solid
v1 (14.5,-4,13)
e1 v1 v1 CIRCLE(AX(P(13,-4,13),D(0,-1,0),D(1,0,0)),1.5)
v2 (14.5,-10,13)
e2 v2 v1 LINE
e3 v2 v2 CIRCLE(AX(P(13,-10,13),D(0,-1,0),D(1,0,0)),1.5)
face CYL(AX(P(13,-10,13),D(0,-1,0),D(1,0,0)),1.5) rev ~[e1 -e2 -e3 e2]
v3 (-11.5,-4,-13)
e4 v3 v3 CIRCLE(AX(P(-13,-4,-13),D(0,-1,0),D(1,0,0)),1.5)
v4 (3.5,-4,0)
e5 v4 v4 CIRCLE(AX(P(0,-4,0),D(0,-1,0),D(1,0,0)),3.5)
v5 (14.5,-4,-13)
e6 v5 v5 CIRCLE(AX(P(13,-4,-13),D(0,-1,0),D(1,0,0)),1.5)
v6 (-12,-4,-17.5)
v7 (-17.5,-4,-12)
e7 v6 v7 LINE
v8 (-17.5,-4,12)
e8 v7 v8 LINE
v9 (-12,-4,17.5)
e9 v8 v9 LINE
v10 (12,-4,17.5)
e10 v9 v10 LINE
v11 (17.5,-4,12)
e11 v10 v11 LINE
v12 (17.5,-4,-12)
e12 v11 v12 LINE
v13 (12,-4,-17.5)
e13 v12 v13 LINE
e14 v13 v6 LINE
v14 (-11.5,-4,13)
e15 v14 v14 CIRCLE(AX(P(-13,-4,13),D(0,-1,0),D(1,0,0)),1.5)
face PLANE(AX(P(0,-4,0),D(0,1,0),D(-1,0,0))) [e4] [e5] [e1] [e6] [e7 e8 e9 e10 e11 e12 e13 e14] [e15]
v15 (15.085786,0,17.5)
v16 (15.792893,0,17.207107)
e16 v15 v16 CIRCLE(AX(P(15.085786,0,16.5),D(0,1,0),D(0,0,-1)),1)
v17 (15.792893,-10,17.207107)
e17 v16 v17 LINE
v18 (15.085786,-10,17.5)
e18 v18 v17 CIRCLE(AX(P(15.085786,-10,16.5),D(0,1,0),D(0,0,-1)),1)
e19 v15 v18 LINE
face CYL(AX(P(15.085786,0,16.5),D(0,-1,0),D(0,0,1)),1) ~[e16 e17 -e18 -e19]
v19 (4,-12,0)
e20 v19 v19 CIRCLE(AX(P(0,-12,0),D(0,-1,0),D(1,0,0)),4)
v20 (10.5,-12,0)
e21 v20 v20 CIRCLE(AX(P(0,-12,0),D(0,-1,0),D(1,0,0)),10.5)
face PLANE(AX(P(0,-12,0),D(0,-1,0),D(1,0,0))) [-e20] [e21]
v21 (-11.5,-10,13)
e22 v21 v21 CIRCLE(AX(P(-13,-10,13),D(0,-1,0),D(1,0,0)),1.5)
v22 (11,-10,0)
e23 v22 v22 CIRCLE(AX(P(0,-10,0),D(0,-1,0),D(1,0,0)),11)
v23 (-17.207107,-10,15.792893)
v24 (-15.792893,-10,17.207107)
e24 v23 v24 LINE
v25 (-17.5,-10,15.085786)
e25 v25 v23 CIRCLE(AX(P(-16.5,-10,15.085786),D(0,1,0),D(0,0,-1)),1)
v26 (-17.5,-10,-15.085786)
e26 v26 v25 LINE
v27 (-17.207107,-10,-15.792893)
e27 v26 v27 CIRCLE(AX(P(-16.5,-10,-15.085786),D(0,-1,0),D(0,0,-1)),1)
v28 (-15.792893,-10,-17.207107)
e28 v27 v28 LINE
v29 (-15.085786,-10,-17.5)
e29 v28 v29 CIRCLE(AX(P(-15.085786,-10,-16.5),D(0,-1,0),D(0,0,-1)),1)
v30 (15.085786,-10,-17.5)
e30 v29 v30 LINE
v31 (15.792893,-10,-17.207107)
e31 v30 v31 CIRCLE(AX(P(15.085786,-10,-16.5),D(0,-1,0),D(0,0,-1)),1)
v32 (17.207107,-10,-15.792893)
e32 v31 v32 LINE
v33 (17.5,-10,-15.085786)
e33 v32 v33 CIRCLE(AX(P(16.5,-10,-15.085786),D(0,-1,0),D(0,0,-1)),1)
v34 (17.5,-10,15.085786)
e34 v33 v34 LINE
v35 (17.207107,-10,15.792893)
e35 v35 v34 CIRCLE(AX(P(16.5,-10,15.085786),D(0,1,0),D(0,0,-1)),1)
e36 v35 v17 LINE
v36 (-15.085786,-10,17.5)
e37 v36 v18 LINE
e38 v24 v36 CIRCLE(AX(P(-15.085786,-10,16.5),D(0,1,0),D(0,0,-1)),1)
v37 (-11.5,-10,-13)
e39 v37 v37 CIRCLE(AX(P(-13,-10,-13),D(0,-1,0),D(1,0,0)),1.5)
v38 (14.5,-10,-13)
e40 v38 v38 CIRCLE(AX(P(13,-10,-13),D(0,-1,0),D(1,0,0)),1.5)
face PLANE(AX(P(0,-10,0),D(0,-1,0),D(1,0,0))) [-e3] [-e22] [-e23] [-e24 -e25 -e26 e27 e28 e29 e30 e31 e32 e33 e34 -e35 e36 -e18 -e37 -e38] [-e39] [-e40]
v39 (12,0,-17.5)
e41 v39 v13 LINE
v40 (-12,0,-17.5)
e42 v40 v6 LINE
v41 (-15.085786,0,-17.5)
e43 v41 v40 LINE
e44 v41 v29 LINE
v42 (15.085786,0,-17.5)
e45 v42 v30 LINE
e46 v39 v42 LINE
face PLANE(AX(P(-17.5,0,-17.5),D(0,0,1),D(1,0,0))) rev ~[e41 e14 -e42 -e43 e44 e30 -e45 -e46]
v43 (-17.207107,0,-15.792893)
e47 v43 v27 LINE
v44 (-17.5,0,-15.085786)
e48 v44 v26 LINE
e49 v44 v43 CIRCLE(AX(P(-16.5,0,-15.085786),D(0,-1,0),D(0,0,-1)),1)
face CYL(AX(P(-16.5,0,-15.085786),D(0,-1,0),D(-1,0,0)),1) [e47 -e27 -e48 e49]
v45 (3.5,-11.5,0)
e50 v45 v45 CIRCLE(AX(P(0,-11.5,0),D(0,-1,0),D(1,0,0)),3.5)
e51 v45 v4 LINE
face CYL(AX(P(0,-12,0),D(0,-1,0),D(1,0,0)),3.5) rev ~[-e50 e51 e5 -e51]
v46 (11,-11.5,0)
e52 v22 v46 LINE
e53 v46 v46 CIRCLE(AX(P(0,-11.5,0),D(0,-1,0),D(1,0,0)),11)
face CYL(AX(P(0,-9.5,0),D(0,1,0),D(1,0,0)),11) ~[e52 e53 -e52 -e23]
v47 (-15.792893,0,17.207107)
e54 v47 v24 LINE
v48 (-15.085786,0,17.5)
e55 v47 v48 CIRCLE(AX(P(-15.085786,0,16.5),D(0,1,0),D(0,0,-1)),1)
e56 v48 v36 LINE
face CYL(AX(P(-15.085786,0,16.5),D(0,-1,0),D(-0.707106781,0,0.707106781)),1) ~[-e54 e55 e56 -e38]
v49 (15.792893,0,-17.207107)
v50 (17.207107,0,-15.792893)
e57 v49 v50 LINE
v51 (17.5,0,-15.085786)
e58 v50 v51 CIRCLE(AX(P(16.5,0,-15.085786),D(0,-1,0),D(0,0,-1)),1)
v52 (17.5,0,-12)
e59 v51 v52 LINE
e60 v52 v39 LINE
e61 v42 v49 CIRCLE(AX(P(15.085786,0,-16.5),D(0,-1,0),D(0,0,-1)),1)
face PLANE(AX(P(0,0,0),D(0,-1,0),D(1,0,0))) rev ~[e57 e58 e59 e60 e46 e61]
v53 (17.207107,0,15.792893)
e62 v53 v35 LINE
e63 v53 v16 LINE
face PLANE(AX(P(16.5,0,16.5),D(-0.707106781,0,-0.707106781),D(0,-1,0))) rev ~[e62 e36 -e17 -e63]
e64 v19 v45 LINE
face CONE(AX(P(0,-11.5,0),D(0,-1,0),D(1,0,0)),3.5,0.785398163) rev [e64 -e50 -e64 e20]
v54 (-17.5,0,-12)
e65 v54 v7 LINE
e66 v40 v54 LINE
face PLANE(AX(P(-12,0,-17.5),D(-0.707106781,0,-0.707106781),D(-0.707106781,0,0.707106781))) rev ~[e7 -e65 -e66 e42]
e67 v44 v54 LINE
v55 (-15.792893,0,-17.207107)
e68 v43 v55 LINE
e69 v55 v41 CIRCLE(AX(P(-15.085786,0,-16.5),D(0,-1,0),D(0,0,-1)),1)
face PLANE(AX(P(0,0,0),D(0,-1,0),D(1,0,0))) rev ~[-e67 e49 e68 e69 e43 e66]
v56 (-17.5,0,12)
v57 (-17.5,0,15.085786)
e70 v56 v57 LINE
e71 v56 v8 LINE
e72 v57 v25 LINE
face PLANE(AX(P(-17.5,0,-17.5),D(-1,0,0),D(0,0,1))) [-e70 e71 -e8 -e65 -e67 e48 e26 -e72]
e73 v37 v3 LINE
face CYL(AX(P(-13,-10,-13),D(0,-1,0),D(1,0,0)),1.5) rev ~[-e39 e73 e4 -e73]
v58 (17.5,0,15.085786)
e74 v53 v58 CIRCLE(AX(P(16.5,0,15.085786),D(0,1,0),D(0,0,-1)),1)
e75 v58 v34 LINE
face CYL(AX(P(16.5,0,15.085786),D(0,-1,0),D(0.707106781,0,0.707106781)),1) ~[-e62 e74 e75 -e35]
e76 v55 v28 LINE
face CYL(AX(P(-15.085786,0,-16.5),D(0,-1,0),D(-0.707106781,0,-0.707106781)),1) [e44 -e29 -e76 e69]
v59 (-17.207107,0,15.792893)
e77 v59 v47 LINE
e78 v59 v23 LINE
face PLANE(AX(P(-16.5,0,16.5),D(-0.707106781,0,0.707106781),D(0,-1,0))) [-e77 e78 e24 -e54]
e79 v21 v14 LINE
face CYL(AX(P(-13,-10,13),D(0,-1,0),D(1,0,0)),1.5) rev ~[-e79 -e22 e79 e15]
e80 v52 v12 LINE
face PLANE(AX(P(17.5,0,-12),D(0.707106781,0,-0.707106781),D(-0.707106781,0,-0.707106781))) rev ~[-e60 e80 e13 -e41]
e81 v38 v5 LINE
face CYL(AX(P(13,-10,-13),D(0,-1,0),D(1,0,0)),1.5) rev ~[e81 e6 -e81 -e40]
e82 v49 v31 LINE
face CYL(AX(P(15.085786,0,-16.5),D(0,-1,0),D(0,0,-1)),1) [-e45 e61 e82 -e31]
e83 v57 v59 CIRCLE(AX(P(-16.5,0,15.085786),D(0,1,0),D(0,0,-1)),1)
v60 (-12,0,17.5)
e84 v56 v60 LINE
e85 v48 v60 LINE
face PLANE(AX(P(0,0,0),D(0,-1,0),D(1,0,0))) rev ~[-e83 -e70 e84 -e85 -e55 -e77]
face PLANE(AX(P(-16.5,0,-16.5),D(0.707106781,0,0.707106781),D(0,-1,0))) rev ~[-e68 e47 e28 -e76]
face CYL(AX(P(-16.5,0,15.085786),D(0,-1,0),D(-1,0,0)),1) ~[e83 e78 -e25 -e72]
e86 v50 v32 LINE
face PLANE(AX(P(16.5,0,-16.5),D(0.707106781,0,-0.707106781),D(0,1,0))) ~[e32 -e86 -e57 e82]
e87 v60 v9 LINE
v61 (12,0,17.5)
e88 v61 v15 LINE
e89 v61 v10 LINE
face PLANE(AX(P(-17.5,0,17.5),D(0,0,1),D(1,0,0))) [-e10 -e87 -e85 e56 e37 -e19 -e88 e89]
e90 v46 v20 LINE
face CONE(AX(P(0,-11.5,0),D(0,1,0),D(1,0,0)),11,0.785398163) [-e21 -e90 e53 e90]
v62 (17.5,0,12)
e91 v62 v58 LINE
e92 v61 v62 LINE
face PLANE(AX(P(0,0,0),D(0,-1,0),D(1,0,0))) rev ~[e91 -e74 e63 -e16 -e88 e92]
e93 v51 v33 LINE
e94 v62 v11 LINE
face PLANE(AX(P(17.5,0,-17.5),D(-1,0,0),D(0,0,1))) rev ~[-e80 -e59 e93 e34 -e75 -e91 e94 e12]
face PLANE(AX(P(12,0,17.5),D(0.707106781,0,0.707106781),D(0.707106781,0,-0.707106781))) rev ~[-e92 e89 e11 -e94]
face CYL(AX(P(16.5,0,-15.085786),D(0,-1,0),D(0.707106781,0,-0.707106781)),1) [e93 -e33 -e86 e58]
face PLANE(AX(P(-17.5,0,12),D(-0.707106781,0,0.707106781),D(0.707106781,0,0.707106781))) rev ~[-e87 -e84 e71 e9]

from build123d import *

# Parameters (mm, degrees)
F0_W      = 35
F0_H      = 35
F1_DEPTH  = 10
F2_SIZE   = 2
F3_R      = 11
F4_DEPTH  = 0.5
F5_R      = 11
F6_DEPTH  = 2.5
F7_R      = 3.5
F8_DEPTH  = 12.001
F9_R      = 1
F10_SIZE  = 0.5
F11_R     = 1.5
F12_DEPTH = 10.001
F14_DEPTH = 4


with BuildPart() as f1:
    # F0 (on Front) → F1 (new body)
    with BuildSketch(Plane.XZ):
        Rectangle(F0_W, F0_H)
    extrude(amount=F1_DEPTH)

    # F2
    f2_edges = [f1.edges().sort_by_distance(p)[0] for p in [
        (-17.5, -5, 17.5),
        (17.5, -5, 17.5),
        (17.5, -5, -17.5),
        (-17.5, -5, -17.5),
    ]]
    chamfer(f2_edges, length=F2_SIZE)

    # F3 (on face) → F4 (cut)
    with BuildSketch(Plane.XZ.offset(10)):
        Circle(F3_R)
    extrude(amount=-F4_DEPTH, mode=Mode.SUBTRACT)

    # F5 (on face) → F6 (join)
    with BuildSketch(Plane.XZ.offset(9.5)):
        Circle(F5_R)
    extrude(amount=F6_DEPTH)

    # F7 (on face) → F8 (cut, through all)
    with BuildSketch(Plane.XZ.offset(12)):
        Circle(F7_R)
    extrude(amount=-F8_DEPTH, mode=Mode.SUBTRACT)

    # F9
    f9_edges = [f1.edges().sort_by_distance(p)[0] for p in [
        (-15.5, -5, 17.5),
        (15.5, -5, 17.5),
        (17.5, -5, 15.5),
        (17.5, -5, -15.5),
        (15.5, -5, -17.5),
        (-15.5, -5, -17.5),
        (-17.5, -5, -15.5),
        (-17.5, -5, 15.5),
    ]]
    fillet(f9_edges, radius=F9_R)

    # F10
    f10_edges = [f1.edges().sort_by_distance(p)[0] for p in [
        (-11, -12, 0),
        (-3.5, -12, 0),
    ]]
    chamfer(f10_edges, length=F10_SIZE)

    # F11 (on face) → F12 (cut, through all)
    with BuildSketch(Plane.XZ.offset(10)):
        with Locations((-13, 13)):
            Circle(F11_R)
        with Locations((-13, -13)):
            Circle(F11_R)
        with Locations((13, -13)):
            Circle(F11_R)
        with Locations((13, 13)):
            Circle(F11_R)
    extrude(amount=-F12_DEPTH, mode=Mode.SUBTRACT)

    # F13 (on face) → F14 (cut)
    with BuildSketch(Plane(origin=(0, 0, 0), x_dir=(-1, 0, 0), z_dir=(0, 1, 0))):
        Polygon((12, 17.5), (-12, 17.5), (-17.5, 12), (-17.5, -12), (-12, -17.5), (12, -17.5), (17.5, -12), (17.5, 12), align=None)
    extrude(amount=-F14_DEPTH, mode=Mode.SUBTRACT)


solid = f1.part
